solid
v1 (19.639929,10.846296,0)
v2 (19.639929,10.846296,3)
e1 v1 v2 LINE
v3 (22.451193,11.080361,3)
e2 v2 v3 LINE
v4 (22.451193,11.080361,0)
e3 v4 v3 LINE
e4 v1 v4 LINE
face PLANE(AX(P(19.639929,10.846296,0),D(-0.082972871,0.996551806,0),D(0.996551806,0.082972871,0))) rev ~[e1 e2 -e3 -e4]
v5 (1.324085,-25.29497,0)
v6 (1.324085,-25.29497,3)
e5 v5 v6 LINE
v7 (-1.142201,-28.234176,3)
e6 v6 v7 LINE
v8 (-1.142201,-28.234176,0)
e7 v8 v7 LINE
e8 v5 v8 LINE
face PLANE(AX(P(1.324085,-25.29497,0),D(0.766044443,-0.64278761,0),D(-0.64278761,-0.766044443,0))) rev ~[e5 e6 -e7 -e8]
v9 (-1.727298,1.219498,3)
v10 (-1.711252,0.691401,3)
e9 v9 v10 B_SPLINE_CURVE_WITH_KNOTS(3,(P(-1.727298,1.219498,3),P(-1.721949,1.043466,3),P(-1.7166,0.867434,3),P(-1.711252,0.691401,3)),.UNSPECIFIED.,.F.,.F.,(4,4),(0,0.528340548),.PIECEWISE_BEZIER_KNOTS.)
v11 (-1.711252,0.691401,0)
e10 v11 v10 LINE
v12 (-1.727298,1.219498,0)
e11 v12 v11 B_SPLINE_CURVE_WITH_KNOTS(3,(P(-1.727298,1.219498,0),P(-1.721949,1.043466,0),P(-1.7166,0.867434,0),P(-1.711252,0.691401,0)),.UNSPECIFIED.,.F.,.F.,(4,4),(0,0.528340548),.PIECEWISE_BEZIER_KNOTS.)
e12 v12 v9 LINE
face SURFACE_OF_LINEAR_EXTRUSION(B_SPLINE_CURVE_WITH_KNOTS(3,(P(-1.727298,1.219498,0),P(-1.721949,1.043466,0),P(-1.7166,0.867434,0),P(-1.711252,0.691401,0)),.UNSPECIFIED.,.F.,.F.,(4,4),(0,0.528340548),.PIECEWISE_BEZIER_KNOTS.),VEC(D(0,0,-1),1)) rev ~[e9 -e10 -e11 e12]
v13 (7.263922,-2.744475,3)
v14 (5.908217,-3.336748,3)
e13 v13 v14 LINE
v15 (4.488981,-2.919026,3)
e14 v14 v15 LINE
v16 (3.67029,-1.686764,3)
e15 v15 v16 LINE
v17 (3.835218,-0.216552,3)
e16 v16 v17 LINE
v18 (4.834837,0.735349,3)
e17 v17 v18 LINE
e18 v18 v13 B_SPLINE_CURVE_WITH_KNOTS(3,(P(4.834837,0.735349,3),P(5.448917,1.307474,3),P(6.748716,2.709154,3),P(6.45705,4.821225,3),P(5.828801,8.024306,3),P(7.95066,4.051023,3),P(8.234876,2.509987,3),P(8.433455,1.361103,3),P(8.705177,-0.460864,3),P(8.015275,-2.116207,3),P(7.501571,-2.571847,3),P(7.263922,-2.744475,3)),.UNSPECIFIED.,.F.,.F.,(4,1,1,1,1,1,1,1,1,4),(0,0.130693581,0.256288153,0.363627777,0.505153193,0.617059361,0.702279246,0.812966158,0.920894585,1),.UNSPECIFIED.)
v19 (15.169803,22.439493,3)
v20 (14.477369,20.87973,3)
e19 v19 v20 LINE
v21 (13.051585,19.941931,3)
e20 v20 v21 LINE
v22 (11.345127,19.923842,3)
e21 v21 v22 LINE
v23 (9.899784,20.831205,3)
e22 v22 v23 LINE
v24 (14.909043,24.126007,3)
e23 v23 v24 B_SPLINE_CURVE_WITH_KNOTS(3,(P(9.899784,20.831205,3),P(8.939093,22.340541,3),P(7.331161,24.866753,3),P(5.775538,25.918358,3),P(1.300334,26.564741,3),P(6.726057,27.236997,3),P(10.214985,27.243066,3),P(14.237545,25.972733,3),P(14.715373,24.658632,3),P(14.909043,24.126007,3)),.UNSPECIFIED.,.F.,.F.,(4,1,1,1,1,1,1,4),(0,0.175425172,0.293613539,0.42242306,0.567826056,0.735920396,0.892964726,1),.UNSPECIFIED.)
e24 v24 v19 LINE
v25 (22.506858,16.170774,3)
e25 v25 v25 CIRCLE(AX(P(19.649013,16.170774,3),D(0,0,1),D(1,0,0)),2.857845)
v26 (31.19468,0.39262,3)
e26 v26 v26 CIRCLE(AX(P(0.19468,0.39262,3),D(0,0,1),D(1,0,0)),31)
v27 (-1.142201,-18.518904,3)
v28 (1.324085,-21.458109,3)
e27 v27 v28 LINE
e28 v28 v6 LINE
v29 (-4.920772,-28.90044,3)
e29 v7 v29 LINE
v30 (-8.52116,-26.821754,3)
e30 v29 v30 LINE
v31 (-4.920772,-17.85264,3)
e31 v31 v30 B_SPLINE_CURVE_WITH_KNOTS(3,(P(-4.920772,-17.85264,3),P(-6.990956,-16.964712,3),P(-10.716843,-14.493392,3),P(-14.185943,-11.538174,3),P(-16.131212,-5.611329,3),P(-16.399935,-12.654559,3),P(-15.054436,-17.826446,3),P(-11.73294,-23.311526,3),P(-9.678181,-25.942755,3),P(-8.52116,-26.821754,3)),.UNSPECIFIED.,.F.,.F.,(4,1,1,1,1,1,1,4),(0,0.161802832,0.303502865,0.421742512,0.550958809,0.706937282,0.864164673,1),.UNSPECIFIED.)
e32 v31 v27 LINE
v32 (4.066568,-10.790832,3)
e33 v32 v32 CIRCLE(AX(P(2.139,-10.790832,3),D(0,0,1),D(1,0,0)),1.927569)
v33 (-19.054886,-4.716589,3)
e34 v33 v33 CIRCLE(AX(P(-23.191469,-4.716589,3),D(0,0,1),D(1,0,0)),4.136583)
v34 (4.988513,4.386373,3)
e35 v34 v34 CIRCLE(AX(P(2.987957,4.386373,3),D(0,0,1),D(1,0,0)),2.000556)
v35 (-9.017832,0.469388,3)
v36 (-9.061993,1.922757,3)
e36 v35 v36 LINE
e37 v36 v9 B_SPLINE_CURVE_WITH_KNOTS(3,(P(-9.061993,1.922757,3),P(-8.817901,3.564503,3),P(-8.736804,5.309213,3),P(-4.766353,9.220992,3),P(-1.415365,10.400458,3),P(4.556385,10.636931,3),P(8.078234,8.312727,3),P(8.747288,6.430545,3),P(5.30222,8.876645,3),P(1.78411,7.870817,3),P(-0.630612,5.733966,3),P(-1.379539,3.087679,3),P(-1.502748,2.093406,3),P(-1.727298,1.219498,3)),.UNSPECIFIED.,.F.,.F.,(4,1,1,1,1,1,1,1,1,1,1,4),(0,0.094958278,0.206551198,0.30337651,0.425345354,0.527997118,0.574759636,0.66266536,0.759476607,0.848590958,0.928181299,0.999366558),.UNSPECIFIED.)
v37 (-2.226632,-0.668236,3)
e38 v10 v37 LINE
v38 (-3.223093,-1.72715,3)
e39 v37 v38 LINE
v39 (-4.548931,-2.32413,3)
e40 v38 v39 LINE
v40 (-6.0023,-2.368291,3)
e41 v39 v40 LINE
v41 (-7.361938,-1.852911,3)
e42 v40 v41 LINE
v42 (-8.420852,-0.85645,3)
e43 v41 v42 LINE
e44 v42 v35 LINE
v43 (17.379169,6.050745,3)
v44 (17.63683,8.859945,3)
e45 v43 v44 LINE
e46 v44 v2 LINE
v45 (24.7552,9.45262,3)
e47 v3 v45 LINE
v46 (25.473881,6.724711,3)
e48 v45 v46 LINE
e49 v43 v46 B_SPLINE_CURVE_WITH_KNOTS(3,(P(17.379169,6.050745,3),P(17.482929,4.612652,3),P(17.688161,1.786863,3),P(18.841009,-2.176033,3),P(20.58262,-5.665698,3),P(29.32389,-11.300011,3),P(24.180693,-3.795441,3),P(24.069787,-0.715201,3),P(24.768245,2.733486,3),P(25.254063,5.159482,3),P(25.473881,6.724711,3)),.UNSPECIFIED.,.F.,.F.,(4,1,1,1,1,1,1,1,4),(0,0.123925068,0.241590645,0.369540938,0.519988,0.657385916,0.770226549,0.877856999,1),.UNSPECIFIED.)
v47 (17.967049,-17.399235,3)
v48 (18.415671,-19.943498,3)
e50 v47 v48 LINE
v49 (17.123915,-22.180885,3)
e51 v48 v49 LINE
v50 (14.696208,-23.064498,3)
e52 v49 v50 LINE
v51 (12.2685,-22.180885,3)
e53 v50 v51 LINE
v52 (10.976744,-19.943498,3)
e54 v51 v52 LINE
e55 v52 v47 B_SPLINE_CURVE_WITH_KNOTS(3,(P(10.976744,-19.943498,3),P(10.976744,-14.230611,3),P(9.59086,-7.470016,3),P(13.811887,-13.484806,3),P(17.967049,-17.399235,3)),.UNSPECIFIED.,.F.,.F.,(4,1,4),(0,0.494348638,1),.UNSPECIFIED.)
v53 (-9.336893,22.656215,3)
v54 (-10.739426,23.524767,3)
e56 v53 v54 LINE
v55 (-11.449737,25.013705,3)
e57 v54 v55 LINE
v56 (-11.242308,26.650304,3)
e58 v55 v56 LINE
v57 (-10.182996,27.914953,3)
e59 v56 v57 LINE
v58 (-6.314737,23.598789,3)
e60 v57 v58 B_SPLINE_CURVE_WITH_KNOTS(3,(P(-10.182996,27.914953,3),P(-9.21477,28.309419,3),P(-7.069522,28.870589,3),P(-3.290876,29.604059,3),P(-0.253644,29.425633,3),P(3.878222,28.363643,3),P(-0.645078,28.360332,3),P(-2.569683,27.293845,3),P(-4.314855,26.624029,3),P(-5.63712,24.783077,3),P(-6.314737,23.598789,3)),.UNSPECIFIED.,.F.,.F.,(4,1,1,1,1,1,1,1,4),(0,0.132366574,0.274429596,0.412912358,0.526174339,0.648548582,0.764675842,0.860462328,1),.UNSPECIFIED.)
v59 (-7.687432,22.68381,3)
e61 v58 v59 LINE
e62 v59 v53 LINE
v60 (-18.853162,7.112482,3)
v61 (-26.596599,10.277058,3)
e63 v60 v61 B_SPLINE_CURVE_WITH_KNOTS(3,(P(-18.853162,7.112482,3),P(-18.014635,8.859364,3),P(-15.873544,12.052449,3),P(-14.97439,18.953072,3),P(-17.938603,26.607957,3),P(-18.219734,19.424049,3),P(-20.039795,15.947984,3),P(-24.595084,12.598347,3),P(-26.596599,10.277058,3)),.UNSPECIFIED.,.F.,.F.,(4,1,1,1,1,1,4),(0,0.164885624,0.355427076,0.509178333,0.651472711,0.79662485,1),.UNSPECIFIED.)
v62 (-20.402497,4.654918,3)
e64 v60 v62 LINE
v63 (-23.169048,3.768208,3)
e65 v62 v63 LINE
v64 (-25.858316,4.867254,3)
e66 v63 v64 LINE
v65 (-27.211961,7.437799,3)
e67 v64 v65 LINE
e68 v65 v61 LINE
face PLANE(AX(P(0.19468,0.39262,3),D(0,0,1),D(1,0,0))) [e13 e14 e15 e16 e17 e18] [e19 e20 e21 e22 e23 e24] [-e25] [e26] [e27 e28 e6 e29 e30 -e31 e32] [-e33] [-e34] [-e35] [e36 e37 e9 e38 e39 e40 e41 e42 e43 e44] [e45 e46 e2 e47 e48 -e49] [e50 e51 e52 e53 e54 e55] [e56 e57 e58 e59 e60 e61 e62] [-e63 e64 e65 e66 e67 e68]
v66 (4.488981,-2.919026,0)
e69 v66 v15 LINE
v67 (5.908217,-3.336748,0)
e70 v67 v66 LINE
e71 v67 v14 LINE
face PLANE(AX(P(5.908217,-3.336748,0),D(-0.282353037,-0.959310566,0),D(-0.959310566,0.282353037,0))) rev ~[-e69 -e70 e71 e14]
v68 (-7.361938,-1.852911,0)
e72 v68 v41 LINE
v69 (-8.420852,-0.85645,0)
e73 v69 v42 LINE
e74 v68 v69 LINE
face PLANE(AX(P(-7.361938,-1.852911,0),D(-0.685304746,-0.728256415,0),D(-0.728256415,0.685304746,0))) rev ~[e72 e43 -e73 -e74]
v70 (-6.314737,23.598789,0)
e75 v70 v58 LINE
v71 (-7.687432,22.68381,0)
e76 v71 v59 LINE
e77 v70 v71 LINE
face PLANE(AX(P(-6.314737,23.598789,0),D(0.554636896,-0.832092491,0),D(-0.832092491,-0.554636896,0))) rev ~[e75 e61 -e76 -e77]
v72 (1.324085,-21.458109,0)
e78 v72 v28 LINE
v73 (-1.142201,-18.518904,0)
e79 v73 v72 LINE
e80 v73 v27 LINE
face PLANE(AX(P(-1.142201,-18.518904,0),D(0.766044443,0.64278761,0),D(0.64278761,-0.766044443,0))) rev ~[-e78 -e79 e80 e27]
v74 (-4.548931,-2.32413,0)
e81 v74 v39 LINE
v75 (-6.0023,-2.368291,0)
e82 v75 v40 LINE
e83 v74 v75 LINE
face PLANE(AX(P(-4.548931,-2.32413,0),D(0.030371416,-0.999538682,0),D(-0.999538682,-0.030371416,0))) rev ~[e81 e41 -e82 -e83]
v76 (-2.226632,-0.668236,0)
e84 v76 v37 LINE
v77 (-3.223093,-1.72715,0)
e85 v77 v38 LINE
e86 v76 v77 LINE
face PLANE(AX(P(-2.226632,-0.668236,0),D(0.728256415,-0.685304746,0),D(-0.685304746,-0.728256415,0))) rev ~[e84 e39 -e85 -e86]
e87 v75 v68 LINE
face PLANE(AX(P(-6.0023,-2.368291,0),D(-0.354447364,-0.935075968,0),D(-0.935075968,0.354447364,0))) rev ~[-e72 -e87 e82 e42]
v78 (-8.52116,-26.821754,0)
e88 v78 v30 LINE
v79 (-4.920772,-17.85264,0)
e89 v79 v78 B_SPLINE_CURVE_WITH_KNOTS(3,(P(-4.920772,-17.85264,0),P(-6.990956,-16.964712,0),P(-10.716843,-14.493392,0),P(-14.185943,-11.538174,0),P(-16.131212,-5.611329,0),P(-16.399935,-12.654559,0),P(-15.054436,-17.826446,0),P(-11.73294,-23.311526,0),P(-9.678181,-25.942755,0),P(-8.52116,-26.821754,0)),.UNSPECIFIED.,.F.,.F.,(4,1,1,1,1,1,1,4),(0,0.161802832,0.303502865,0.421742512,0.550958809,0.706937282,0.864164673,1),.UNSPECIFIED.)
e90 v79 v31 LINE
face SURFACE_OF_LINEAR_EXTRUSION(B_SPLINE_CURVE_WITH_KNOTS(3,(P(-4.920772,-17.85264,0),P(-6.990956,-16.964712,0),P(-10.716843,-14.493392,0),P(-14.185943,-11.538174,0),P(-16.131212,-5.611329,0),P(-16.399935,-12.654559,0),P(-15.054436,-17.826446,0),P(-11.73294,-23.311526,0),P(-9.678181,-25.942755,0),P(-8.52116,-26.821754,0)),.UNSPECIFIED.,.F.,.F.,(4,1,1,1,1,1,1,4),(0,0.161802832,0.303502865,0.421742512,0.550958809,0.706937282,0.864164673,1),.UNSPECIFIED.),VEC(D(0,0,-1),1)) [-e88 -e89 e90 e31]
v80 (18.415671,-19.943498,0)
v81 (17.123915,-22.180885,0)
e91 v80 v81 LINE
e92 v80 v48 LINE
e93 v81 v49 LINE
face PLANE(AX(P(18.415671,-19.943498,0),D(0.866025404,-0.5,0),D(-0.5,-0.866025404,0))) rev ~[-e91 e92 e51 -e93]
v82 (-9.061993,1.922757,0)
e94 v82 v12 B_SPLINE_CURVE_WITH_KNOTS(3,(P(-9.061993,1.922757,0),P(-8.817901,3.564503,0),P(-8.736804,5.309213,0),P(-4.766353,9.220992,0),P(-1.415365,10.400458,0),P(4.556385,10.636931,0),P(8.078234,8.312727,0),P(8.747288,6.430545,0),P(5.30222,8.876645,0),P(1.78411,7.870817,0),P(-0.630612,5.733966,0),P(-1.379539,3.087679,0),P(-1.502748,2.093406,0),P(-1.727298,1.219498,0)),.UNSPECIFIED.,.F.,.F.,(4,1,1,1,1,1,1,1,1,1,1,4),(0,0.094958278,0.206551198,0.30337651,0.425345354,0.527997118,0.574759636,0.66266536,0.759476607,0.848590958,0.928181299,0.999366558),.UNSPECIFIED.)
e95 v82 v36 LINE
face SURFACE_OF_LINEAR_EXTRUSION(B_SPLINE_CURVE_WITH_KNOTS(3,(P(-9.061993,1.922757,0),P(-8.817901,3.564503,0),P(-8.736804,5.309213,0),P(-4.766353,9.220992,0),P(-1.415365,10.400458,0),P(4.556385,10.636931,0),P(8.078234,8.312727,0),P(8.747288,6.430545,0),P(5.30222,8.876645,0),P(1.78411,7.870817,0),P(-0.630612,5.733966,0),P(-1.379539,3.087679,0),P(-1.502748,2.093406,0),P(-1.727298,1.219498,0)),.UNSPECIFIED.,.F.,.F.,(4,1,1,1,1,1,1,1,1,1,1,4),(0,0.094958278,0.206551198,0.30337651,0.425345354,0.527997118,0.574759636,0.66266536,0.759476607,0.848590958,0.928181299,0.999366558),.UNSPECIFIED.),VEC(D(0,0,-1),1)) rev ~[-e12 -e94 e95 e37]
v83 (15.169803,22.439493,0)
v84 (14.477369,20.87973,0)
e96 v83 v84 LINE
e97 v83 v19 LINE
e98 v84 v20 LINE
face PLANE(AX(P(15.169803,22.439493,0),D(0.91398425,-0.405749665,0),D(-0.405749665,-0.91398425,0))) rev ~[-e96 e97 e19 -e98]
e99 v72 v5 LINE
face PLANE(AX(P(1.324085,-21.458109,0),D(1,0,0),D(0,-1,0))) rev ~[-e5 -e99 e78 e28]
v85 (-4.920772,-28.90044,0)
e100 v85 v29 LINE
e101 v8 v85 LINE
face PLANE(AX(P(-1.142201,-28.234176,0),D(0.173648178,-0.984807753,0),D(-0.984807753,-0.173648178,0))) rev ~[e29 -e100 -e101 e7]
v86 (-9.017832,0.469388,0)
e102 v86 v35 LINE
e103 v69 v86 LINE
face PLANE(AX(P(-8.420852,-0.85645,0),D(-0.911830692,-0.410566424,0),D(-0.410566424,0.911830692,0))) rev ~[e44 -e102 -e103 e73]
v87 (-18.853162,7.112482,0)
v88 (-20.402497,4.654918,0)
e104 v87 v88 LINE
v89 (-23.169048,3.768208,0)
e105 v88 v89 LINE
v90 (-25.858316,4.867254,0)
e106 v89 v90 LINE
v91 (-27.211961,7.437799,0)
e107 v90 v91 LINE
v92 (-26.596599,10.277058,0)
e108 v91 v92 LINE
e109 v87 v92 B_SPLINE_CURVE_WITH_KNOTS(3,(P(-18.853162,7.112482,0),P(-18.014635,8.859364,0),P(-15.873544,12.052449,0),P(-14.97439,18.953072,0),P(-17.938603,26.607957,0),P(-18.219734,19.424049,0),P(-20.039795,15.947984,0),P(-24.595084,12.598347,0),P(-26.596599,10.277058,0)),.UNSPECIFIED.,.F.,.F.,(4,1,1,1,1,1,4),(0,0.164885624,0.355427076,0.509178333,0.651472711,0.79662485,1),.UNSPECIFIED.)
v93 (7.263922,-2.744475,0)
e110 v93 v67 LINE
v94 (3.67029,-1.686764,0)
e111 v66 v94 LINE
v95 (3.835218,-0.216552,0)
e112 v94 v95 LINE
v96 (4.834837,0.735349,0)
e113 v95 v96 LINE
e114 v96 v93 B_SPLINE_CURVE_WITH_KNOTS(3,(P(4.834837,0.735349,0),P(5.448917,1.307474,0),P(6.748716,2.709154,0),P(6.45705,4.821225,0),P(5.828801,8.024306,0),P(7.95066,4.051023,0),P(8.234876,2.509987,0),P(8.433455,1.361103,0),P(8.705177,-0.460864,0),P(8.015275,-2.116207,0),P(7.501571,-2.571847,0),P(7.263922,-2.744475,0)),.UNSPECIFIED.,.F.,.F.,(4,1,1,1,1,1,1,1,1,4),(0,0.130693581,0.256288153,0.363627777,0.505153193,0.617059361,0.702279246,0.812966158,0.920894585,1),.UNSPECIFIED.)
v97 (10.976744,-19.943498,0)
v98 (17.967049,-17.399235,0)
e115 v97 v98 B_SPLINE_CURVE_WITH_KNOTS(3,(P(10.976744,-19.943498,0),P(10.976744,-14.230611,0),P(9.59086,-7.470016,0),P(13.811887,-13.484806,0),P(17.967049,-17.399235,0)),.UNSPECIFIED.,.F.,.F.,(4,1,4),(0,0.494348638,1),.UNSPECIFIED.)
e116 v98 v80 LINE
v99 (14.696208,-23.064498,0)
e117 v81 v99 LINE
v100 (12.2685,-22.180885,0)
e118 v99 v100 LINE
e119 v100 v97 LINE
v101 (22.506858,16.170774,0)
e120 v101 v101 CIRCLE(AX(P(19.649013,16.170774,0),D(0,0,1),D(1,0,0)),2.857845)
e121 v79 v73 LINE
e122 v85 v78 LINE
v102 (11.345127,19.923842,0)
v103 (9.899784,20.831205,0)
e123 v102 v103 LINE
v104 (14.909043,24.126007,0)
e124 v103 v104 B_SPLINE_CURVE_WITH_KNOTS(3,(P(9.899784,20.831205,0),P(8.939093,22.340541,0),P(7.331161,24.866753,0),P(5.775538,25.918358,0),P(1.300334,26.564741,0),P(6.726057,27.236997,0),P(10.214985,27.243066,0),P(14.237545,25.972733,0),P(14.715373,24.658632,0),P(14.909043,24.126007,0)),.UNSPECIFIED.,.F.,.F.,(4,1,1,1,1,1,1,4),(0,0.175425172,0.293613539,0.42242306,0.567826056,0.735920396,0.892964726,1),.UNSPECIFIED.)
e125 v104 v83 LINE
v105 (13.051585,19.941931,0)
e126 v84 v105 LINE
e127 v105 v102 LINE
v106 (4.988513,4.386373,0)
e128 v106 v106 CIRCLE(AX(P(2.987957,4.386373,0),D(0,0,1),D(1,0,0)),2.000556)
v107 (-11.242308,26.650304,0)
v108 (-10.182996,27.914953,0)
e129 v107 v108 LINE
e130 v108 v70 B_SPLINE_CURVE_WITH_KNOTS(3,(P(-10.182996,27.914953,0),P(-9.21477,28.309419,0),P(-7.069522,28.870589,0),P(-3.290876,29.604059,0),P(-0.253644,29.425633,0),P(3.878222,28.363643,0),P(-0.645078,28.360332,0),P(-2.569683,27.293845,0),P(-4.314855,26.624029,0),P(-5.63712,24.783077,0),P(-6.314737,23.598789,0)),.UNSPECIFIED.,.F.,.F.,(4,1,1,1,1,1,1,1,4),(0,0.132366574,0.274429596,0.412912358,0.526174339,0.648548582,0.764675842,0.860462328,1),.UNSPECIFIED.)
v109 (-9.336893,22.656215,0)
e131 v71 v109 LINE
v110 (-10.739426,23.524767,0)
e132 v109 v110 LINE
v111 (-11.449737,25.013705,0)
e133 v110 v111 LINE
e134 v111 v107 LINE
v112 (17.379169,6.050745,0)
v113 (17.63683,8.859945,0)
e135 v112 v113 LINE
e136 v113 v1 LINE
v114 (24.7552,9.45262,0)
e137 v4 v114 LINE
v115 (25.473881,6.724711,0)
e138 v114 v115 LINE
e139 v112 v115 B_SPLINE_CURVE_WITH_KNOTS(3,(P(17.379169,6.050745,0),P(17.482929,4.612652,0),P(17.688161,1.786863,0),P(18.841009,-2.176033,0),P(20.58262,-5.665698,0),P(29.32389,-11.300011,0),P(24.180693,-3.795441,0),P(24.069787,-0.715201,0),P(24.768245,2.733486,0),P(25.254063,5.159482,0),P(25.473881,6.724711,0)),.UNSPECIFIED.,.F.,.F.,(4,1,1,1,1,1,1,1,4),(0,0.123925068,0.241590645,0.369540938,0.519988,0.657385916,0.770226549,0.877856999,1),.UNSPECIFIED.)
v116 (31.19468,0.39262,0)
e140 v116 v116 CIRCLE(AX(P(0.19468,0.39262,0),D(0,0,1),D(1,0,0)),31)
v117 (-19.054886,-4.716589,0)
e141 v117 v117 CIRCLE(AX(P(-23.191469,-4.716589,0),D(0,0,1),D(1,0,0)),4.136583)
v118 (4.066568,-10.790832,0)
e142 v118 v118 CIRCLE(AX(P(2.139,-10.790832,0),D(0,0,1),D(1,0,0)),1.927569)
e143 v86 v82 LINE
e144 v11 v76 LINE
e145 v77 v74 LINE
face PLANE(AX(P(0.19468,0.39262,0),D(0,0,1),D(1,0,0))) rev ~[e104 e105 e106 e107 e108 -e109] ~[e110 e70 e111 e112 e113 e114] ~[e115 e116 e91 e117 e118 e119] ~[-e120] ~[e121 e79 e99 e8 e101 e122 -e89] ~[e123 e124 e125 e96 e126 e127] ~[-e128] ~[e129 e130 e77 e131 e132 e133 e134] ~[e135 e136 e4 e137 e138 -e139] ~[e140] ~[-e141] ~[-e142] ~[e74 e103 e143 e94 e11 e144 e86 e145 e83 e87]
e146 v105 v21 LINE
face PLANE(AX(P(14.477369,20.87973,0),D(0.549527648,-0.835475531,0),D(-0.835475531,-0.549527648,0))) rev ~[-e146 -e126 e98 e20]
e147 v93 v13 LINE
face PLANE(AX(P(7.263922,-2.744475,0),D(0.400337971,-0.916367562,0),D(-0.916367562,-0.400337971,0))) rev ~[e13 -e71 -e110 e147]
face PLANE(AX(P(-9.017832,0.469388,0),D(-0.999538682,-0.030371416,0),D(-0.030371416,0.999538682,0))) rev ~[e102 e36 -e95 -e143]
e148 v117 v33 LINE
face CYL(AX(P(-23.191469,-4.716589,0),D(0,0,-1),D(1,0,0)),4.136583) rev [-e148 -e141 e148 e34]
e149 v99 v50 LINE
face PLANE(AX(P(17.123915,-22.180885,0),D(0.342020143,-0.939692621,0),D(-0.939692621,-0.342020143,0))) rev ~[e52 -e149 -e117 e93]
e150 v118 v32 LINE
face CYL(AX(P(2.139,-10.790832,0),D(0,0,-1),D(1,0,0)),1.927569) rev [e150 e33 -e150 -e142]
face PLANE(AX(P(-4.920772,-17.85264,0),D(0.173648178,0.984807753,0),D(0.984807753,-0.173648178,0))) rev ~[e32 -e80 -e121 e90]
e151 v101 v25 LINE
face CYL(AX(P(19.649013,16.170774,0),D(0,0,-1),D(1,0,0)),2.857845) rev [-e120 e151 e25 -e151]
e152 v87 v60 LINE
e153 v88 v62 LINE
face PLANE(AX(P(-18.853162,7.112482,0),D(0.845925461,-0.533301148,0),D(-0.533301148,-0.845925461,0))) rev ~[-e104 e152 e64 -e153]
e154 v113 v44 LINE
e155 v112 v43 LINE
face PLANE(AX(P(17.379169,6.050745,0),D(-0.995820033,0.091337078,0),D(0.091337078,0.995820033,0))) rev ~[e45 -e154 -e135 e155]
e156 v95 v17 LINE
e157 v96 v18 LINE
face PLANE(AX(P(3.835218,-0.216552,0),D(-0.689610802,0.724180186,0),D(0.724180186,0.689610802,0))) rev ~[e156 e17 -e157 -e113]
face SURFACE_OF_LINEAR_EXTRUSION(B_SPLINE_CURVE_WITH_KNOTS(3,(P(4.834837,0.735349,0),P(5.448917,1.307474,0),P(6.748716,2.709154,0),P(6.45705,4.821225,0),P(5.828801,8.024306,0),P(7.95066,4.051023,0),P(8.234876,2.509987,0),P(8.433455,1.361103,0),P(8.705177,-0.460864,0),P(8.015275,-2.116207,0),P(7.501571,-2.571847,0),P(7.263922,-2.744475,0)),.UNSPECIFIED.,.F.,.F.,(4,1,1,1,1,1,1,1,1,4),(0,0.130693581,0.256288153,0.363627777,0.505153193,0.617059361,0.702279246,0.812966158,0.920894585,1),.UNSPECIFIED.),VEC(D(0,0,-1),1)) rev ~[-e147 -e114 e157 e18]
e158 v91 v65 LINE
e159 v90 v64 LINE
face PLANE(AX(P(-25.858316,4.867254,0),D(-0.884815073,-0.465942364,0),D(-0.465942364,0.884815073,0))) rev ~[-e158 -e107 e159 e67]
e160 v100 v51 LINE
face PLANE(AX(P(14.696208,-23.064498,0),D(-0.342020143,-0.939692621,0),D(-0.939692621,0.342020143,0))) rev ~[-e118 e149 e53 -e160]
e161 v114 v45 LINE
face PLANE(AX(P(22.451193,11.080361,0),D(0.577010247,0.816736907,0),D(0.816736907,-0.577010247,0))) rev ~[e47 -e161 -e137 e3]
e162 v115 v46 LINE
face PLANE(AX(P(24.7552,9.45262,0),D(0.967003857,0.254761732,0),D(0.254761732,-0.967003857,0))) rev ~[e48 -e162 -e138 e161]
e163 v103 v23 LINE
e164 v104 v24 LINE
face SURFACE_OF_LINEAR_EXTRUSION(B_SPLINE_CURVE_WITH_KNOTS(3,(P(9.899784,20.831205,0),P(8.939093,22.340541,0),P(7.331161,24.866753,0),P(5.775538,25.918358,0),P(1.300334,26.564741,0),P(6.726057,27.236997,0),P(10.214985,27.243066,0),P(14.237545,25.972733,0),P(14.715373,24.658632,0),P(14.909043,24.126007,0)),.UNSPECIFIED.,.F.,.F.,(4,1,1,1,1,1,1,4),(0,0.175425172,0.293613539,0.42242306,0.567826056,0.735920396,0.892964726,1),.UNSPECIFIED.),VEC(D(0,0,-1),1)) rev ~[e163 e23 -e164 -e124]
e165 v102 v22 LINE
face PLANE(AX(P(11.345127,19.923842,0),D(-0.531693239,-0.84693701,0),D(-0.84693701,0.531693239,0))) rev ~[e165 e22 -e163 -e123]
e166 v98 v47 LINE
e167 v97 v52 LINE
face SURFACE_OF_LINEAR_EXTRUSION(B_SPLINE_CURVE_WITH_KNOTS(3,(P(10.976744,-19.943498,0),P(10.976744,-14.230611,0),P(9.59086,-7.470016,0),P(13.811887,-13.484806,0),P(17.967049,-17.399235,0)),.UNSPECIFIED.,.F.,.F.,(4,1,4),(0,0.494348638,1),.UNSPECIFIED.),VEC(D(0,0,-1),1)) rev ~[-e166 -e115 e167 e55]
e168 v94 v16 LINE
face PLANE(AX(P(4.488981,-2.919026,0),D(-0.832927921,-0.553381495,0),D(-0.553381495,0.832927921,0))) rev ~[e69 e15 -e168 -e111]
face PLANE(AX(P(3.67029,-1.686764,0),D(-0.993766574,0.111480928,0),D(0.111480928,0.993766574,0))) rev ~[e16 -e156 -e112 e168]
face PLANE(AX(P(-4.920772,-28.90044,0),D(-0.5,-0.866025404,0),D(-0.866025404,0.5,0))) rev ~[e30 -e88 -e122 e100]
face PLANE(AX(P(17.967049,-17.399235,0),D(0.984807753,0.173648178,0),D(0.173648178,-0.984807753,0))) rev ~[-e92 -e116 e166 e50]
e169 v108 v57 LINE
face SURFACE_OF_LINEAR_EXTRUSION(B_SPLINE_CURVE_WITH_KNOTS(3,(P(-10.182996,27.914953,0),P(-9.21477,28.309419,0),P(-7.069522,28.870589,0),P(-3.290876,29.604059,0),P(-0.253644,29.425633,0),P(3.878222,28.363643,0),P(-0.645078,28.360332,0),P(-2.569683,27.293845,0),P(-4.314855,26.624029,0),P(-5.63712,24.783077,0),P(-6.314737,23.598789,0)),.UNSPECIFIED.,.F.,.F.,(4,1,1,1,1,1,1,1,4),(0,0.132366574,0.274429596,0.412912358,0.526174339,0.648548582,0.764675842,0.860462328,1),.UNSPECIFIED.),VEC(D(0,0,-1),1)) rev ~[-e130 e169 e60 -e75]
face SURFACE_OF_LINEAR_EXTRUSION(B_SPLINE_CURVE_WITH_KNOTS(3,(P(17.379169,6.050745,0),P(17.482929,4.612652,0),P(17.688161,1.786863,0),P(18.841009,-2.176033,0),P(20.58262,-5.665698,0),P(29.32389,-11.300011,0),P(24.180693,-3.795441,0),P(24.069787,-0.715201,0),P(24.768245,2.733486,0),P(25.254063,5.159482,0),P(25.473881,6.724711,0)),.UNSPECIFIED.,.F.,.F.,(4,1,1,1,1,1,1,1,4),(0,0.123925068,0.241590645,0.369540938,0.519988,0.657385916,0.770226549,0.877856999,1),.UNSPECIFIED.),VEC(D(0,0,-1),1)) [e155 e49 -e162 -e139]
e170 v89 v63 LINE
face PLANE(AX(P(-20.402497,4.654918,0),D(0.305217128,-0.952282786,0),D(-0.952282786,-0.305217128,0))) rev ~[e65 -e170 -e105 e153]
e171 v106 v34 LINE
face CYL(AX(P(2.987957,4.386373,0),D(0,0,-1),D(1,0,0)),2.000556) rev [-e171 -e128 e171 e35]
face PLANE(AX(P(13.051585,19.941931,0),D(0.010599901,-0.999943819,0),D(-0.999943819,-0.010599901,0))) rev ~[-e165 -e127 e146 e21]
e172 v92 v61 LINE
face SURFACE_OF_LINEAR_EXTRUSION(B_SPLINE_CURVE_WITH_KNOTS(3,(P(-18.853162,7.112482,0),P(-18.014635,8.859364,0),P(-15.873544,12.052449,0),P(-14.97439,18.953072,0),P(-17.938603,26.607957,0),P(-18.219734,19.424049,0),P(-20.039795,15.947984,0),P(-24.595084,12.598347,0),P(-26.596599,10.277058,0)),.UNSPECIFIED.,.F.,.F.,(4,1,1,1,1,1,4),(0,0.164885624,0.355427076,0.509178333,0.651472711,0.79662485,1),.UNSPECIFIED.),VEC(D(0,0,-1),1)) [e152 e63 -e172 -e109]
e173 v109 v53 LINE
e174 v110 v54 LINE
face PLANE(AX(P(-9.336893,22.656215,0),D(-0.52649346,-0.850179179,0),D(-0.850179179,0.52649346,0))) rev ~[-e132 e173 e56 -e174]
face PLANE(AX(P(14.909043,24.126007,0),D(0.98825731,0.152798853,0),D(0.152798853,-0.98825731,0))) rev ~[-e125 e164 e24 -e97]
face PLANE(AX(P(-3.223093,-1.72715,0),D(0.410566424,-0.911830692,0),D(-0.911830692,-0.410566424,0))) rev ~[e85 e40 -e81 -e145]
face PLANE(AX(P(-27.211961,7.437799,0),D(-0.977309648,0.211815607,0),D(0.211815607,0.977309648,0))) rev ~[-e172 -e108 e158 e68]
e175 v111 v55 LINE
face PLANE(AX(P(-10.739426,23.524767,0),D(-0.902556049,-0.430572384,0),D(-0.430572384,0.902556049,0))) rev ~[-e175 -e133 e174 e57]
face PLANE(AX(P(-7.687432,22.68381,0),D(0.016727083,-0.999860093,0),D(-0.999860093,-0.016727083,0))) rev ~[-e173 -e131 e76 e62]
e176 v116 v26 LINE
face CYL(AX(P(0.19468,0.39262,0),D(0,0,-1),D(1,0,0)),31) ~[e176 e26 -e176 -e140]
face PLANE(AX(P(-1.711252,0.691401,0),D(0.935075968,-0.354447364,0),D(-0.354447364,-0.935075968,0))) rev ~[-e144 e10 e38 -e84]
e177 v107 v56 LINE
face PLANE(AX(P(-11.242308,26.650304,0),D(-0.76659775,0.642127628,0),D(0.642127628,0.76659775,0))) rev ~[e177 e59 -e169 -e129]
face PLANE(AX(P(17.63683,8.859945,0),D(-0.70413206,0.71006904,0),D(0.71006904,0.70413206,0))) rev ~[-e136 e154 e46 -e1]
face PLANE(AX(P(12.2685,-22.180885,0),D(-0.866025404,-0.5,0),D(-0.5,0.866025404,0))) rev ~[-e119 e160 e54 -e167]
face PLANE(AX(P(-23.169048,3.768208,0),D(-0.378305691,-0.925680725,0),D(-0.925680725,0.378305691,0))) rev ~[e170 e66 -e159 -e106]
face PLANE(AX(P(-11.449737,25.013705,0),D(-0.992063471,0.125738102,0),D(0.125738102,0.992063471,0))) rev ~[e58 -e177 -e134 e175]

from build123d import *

# Parameters (mm, degrees)
F0_R     = 31
F0_R_2   = 4.1365832931
F0_R_3   = 1.9275687043
F0_R_4   = 2.0005563938
F0_R_5   = 2.8578450459
F1_DEPTH = 3


with BuildPart() as f1:
    # F0 (on Top) → F1 (new body)
    with BuildSketch(Plane.XY):
        with Locations((0.1946801621, 0.3926200628)):
            Circle(F0_R)
        with BuildLine():
            Line((-1.1422014806, -18.5189035409), (1.3240849968, -21.4581093107))
            Line((1.3240849968, -21.4581093107), (1.3240849968, -25.2949699475))
            Line((1.3240849968, -25.2949699475), (-1.1422014806, -28.2341757172))
            Line((-1.1422014806, -28.2341757172), (-4.9207715829, -28.9004395748))
            Line((-4.9207715829, -28.9004395748), (-8.5211597808, -26.8217544795))
            add(Edge.make_bspline(
                [(-4.9207715829, -17.8526396834), (-6.9909564865, -16.9647118268), (-10.7168431989, -14.4933921603), (-14.1859433865, -11.5381742982), (-16.131211939, -5.6113285497), (-16.3999346819, -12.6545592251), (-15.0544363476, -17.8264461458), (-11.732939874, -23.3115263439), (-9.6781806545, -25.9427554538), (-8.5211597808, -26.8217544795)],
                knots=[0, 0, 0, 0, 0.1618028325, 0.3035028648, 0.4217425117, 0.5509588088, 0.7069372822, 0.8641646726, 1, 1, 1, 1], degree=3))
            Line((-4.9207715829, -17.8526396834), (-1.1422014806, -18.5189035409))
        make_face(mode=Mode.SUBTRACT)
        with Locations((-23.1914689183, -4.7165894897)):
            Circle(F0_R_2, mode=Mode.SUBTRACT)
        with BuildLine():
            add(Edge.make_bspline(
                [(10.9767442969, -19.9434975307), (10.9767442969, -14.2306106595), (9.5908596585, -7.470016463), (13.8118869508, -13.4848055604), (17.9670492103, -17.3992346138)],
                knots=[0, 0, 0, 0, 0.4943486381, 1, 1, 1, 1], degree=3))
            Line((17.9670492103, -17.3992346138), (18.4156714086, -19.9434975307))
            Line((18.4156714086, -19.9434975307), (17.1239152718, -22.1808847906))
            Line((17.1239152718, -22.1808847906), (14.6962078527, -23.0644980286))
            Line((14.6962078527, -23.0644980286), (12.2685004336, -22.1808847906))
            Line((12.2685004336, -22.1808847906), (10.9767442969, -19.9434975307))
        make_face(mode=Mode.SUBTRACT)
        with Locations((2.1389996326, -10.7908323988)):
            Circle(F0_R_3, mode=Mode.SUBTRACT)
        with BuildLine():
            add(Edge.make_bspline(
                [(17.3791687237, 6.0507453724), (17.4829293163, 4.6126524003), (17.6881609354, 1.7868632521), (18.8410094769, -2.1760334773), (20.5826203099, -5.6656983025), (29.3238900367, -11.300011281), (24.1806930972, -3.7954405403), (24.0697865205, -0.71520103), (24.7682450981, 2.7334855195), (25.2540633757, 5.1594822195), (25.4738810638, 6.724710861)],
                knots=[0, 0, 0, 0, 0.1239250683, 0.2415906445, 0.3695409376, 0.5199879999, 0.6573859161, 0.7702265486, 0.877856999, 1, 1, 1, 1], degree=3))
            Line((17.3791687237, 6.0507453724), (17.6368298374, 8.8599451395))
            Line((17.6368298374, 8.8599451395), (19.6399285052, 10.8462956392))
            Line((19.6399285052, 10.8462956392), (22.4511925984, 11.080361397))
            Line((22.4511925984, 11.080361397), (24.7552004041, 9.4526204434))
            Line((24.7552004041, 9.4526204434), (25.4738810638, 6.724710861))
        make_face(mode=Mode.SUBTRACT)
        with BuildLine():
            add(Edge.make_bspline(
                [(-18.8531623265, 7.1124824437), (-18.0146350035, 8.8593640986), (-15.8735436071, 12.0524492088), (-14.9743904527, 18.9530716251), (-17.9386034601, 26.6079568134), (-18.2197344554, 19.4240488252), (-20.0397954496, 15.9479840875), (-24.5950836461, 12.5983474658), (-26.5965992132, 10.2770576194)],
                knots=[0, 0, 0, 0, 0.1648856245, 0.3554270756, 0.5091783331, 0.6514727109, 0.7966248505, 1, 1, 1, 1], degree=3))
            Line((-18.8531623265, 7.1124824437), (-20.4024971664, 4.6549182851))
            Line((-20.4024971664, 4.6549182851), (-23.1690483022, 3.7682081561))
            Line((-23.1690483022, 3.7682081561), (-25.8583157107, 4.8672535807))
            Line((-25.8583157107, 4.8672535807), (-27.2119612836, 7.4377989904))
            Line((-27.2119612836, 7.4377989904), (-26.5965992132, 10.2770576194))
        make_face(mode=Mode.SUBTRACT)
        with BuildLine():
            add(Edge.make_bspline(
                [(-1.7272980043, 1.2194981841), (-1.7219491873, 1.0434659123), (-1.7166003704, 0.8674336406), (-1.7112515534, 0.6914013688)],
                knots=[0, 0, 0, 0, 0.5283405483, 0.5283405483, 0.5283405483, 0.5283405483], degree=3))
            Line((-1.7112515534, 0.6914013688), (-2.2266321603, -0.6682363927))
            Line((-2.2266321603, -0.6682363927), (-3.2230925997, -1.7271502725))
            Line((-3.2230925997, -1.7271502725), (-4.5489308027, -2.3241302316))
            Line((-4.5489308027, -2.3241302316), (-6.0022999218, -2.3682914828))
            Line((-6.0022999218, -2.3682914828), (-7.3619376832, -1.852910876))
            Line((-7.3619376832, -1.852910876), (-8.420851563, -0.8564504365))
            Line((-8.420851563, -0.8564504365), (-9.0178315221, 0.4693877665))
            Line((-9.0178315221, 0.4693877665), (-9.0619927733, 1.9227568855))
            add(Edge.make_bspline(
                [(-9.0619927733, 1.9227568855), (-8.8179008554, 3.564503481), (-8.7368035813, 5.3092127127), (-4.7663528657, 9.2209920717), (-1.4153652629, 10.4004575787), (4.5563847989, 10.6369311157), (8.0782344465, 8.3127273723), (8.747287529, 6.4305452611), (5.3022202088, 8.8766445635), (1.7841099871, 7.8708167043), (-0.630612326, 5.7339658841), (-1.3795391649, 3.0876786056), (-1.5027476697, 2.0934057257), (-1.7272980043, 1.2194981841)],
                knots=[0, 0, 0, 0, 0.0949582783, 0.206551198, 0.3033765102, 0.4253453535, 0.5279971179, 0.5747596359, 0.6626653595, 0.7594766074, 0.8485909582, 0.9281812992, 0.9993665584, 0.9993665584, 0.9993665584, 0.9993665584], degree=3))
        make_face(mode=Mode.SUBTRACT)
        with BuildLine():
            add(Edge.make_bspline(
                [(-10.1829958127, 27.9149531313), (-9.2147696429, 28.3094194496), (-7.0695223864, 28.8705887737), (-3.2908756665, 29.6040592936), (-0.2536438221, 29.4256325965), (3.8782219705, 28.3636429154), (-0.6450782687, 28.360332478), (-2.5696827244, 27.2938452286), (-4.3148545094, 26.6240290951), (-5.6371197048, 24.7830766655), (-6.3147368559, 23.5987893069)],
                knots=[0, 0, 0, 0, 0.1323665743, 0.2744295955, 0.4129123579, 0.5261743392, 0.648548582, 0.764675842, 0.8604623277, 1, 1, 1, 1], degree=3))
            Line((-6.3147368559, 23.5987893069), (-7.6874323935, 22.6838097824))
            Line((-7.6874323935, 22.6838097824), (-9.3368926421, 22.6562152625))
            Line((-9.3368926421, 22.6562152625), (-10.7394256273, 23.5247668123))
            Line((-10.7394256273, 23.5247668123), (-11.4497370361, 25.0137054517))
            Line((-11.4497370361, 25.0137054517), (-11.242308015, 26.6503036829))
            Line((-11.242308015, 26.6503036829), (-10.1829958127, 27.9149531313))
        make_face(mode=Mode.SUBTRACT)
        with BuildLine():
            add(Edge.make_bspline(
                [(4.8348368809, 0.7353488595), (5.4489169037, 1.3074735731), (6.748716136, 2.7091540079), (6.4570504869, 4.8212247028), (5.8288014151, 8.024305967), (7.9506600098, 4.0510234784), (8.2348759594, 2.509987015), (8.4334547204, 1.3611032539), (8.7051767486, -0.4608636504), (8.0152749224, -2.1162070331), (7.5015709254, -2.5718468674), (7.2639224009, -2.7444747645)],
                knots=[0, 0, 0, 0, 0.1306935807, 0.2562881533, 0.3636277771, 0.5051531931, 0.6170593609, 0.7022792464, 0.8129661585, 0.9208945849, 1, 1, 1, 1], degree=3))
            Line((7.2639224009, -2.7444747645), (5.9082172801, -3.3367482799))
            Line((5.9082172801, -3.3367482799), (4.4889808287, -2.9190256612))
            Line((4.4889808287, -2.9190256612), (3.6702895552, -1.6867639641))
            Line((3.6702895552, -1.6867639641), (3.8352182052, -0.2165521318))
            Line((3.8352182052, -0.2165521318), (4.8348368809, 0.7353488595))
        make_face(mode=Mode.SUBTRACT)
        with Locations((2.9879567598, 4.3863726313)):
            Circle(F0_R_4, mode=Mode.SUBTRACT)
        with BuildLine():
            Line((14.9090430899, 24.1260071552), (15.1698025284, 22.4394930436))
            Line((15.1698025284, 22.4394930436), (14.4773689593, 20.879729893))
            Line((14.4773689593, 20.879729893), (13.0515851483, 19.941931483))
            Line((13.0515851483, 19.941931483), (11.3451273812, 19.9238421826))
            Line((11.3451273812, 19.9238421826), (9.8997839419, 20.8312052169))
            add(Edge.make_bspline(
                [(9.8997839419, 20.8312052169), (8.9390931135, 22.3405406549), (7.3311606242, 24.8667534764), (5.7755384173, 25.9183575041), (1.3003343599, 26.564740684), (6.7260565905, 27.2369968987), (10.2149852059, 27.2430659991), (14.2375450805, 25.9727334709), (14.7153726717, 24.6586316051), (14.9090430899, 24.1260071552)],
                knots=[0, 0, 0, 0, 0.1754251721, 0.2936135386, 0.4224230604, 0.5678260556, 0.7359203963, 0.8929647257, 1, 1, 1, 1], degree=3))
        make_face(mode=Mode.SUBTRACT)
        with Locations((19.649013007, 16.1707739057)):
            Circle(F0_R_5, mode=Mode.SUBTRACT)
    extrude(amount=F1_DEPTH)


solid = f1.part
